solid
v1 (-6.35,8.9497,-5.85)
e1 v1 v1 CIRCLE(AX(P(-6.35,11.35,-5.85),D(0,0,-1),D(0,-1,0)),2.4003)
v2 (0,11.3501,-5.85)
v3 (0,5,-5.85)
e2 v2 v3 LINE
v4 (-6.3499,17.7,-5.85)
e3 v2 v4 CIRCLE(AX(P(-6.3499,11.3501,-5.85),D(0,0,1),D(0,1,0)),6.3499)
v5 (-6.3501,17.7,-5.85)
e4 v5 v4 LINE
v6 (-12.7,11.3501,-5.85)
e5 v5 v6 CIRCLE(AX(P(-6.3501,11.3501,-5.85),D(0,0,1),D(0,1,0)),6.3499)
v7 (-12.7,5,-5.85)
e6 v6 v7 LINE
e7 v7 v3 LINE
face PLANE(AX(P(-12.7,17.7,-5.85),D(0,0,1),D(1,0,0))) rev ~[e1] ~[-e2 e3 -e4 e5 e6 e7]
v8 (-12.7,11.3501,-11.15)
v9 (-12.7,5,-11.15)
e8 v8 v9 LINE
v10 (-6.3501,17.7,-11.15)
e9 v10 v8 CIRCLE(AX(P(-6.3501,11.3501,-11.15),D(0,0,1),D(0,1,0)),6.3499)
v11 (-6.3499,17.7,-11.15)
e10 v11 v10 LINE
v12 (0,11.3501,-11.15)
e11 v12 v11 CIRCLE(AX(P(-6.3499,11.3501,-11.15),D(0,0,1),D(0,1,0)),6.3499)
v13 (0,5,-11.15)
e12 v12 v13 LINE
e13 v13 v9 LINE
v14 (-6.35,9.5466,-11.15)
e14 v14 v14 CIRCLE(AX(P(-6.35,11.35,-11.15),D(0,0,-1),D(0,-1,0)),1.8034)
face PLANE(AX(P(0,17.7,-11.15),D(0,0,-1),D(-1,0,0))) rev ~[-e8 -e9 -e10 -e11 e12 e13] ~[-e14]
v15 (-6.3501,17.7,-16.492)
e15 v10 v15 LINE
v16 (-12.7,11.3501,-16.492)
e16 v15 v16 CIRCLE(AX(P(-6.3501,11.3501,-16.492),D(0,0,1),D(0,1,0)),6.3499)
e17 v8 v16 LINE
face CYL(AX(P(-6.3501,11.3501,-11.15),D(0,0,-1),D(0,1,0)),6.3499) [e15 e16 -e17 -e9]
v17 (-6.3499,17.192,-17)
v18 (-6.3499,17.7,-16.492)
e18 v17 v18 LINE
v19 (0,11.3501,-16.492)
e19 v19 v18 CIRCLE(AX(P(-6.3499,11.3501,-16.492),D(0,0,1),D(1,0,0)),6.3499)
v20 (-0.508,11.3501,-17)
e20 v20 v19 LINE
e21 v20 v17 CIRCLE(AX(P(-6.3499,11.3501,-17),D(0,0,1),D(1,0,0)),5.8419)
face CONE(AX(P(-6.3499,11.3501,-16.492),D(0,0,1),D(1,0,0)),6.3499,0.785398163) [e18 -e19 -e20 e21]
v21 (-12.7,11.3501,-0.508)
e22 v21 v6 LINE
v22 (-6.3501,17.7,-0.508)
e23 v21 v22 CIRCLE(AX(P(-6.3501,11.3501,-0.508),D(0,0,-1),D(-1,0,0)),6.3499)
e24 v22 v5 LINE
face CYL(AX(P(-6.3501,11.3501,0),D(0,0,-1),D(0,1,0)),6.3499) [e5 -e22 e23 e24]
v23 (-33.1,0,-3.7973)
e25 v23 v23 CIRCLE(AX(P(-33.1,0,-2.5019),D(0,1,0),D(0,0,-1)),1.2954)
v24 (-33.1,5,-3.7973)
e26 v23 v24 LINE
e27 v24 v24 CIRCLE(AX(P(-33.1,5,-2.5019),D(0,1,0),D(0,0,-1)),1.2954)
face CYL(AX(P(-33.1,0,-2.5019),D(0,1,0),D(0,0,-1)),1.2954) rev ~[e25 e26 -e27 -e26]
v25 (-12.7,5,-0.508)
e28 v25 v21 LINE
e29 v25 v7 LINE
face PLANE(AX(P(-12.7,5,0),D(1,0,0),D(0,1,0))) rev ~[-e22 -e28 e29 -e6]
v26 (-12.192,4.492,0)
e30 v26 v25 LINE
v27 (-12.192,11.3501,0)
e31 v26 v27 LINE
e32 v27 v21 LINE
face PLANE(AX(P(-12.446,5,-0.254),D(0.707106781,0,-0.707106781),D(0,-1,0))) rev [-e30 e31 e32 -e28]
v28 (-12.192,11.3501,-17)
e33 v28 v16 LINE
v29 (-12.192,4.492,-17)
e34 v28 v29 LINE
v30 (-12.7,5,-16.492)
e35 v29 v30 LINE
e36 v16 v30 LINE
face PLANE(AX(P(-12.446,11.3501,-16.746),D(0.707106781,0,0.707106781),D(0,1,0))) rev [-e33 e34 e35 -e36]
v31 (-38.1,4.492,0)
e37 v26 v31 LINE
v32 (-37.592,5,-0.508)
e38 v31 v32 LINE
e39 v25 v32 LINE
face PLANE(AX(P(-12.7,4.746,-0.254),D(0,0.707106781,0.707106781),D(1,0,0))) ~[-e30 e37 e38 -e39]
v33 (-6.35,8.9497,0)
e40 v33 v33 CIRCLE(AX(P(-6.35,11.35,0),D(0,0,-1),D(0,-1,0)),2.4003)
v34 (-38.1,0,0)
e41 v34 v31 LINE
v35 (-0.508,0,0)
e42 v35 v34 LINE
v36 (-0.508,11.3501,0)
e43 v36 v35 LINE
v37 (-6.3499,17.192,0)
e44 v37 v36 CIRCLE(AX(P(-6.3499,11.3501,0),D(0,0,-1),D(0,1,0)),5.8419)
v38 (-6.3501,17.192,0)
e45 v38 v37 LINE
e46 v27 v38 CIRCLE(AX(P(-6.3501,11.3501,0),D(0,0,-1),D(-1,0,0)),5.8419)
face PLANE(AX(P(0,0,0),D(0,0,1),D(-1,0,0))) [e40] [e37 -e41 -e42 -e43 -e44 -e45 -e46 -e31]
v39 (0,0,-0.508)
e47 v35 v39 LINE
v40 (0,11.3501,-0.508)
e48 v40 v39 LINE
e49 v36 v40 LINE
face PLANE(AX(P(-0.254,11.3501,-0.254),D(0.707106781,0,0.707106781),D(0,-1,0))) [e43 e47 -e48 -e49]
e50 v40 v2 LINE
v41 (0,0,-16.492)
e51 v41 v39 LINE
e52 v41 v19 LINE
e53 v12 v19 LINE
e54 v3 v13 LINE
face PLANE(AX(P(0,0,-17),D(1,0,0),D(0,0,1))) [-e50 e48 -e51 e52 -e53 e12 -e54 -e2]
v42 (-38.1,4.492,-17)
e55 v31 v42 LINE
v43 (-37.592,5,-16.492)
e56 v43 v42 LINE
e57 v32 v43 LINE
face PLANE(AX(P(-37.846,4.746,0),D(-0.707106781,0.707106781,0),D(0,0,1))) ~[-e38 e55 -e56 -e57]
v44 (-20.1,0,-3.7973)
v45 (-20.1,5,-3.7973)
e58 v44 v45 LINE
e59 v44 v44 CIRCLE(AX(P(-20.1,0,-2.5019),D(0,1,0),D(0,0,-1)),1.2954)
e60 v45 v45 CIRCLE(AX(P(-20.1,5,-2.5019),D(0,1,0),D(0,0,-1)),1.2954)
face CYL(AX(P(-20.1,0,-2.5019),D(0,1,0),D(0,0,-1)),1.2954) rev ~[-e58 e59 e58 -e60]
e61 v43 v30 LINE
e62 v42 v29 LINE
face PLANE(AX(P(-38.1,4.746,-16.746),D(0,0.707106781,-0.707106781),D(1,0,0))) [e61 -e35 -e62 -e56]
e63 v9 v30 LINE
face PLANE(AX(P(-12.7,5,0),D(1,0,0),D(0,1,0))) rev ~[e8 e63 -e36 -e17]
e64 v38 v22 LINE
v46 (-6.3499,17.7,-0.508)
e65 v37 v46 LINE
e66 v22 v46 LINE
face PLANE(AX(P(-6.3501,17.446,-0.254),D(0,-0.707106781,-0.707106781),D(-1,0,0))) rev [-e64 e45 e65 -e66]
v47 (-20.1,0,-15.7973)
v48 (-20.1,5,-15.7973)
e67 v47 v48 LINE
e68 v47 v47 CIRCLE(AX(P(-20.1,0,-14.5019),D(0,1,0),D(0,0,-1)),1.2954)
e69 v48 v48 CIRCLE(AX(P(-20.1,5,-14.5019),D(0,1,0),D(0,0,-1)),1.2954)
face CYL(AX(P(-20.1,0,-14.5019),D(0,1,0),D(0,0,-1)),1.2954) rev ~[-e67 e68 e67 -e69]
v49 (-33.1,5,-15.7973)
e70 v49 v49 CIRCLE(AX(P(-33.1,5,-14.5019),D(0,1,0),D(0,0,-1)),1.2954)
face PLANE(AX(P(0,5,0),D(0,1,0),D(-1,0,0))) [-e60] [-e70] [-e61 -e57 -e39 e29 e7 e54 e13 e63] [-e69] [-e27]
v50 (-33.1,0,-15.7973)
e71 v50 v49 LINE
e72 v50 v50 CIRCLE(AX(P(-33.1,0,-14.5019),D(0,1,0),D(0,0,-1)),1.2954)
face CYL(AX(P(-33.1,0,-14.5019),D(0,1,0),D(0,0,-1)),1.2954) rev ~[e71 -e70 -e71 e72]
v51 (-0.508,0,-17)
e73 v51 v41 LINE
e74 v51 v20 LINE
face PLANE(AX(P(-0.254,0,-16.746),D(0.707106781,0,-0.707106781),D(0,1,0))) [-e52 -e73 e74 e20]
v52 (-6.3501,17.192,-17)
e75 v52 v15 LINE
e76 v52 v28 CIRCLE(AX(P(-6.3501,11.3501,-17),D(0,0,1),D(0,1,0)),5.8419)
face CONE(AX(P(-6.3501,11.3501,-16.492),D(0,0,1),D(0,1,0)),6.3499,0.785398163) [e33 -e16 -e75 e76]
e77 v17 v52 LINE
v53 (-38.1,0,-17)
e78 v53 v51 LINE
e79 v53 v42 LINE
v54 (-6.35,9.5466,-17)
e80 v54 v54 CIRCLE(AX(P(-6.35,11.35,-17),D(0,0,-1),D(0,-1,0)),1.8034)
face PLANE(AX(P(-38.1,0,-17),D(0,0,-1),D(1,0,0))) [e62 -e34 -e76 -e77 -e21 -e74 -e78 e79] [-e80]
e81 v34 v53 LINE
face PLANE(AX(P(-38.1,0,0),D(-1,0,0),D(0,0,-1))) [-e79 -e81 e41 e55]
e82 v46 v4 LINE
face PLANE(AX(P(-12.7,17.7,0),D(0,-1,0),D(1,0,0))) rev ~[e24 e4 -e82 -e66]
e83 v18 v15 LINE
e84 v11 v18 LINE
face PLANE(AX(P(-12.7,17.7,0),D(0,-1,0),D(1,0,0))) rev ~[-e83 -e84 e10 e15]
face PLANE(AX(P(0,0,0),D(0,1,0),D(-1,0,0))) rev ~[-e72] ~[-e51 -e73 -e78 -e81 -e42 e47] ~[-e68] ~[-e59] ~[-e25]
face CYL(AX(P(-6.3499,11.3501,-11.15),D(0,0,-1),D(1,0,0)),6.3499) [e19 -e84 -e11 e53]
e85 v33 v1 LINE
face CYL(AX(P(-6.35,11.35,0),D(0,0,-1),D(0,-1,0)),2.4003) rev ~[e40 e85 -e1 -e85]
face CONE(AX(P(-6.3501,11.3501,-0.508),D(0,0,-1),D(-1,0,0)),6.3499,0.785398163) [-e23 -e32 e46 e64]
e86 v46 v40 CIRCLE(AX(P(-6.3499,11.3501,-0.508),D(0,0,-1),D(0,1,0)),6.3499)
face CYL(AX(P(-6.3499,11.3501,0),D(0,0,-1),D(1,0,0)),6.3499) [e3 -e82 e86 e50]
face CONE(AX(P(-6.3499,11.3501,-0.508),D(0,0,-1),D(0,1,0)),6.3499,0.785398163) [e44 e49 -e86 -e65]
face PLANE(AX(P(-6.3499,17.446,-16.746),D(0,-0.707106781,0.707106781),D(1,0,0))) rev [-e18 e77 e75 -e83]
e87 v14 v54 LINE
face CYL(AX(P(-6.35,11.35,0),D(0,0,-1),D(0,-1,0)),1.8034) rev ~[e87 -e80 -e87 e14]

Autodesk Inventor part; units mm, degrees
ref_plane "YZ Plane" through (0, 0, 0) normal (1, 0, 0) x (0, 1, 0)
ref_plane "XZ Plane" through (0, 0, 0) normal (0, 1, 0) x (-1, 0, 0)
ref_plane "XY Plane" through (0, 0, 0) normal (0, 0, 1) x (1, 0, 0)
sketch "Sketch1" plane through (0, 0, 0) normal (0, 1, 0) x (-1, 0, 0)
  line L0 (0, 0) -> (38.1, 0)
  line L1 (38.1, 0) -> (38.1, -17)
  line L2 (38.1, -17) -> (0, -17)
  line L3 (0, -17) -> (0, 0)
  circle A0 centre (33.1, -2.5019) radius 1
  circle A1 centre (20.1, -2.5019) radius 1
  circle A2 centre (33.1, -14.5019) radius 1
  circle A3 centre (20.1, -14.5019) radius 1
  dimension "d0" = 38.1
  dimension "d1" = 17
  dimension "d41" = 2
  dimension "d42" = 2
  dimension "d43" = 2
  dimension "d44" = 2
  dimension "d45" = 13
  dimension "d46" = 12
  dimension "d47" = 2.5019
  dimension "d48" = 5
extrude "Extrusion1" add sketch "Sketch1" along normal blind 5 contours L0 L1 L2 L3 | A0 | A1 | A2 | A3
sketch "Sketch2" plane through (-38.1, 0, 0) normal (0, 0, 1) x (1, 0, 0)
  line L0 (0, 0) -> (38.1, 0) projected
  line L1 (38.1, 0) -> (38.1, 5) projected
  line L2 (0, 5) -> (38.1, 5) projected
  line L3 (0, 0) -> (0, 5) projected
  line L4 (38.1, 5) -> (25.4, 5)
  line L5 (25.4, 5) -> (25.4, 17.7)
  line L6 (25.4, 17.7) -> (38.1, 17.7)
  line L7 (38.1, 17.7) -> (38.1, 5)
  line L8 (31.75, 17.7) -> (31.75, 5) construction
  circle A0 centre (31.75, 11.35) radius 1.5
  point P0 (25.4, 5)
  dimension "d6" = 12.7
  dimension "d7" = 12.7
  dimension "d14" = 3
extrude "Extrusion2" add sketch "Sketch2" against normal up to surface (17 mm away) contours L2 L5 L6 L7 | A0
sketch "Sketch3" plane through (-12.7, 17.7, 0) normal (0, 1, 0) x (1, 0, 0)
  line L0 (12.7, 17) -> (0, 17) projected
  line L1 (0, 0) -> (0, 17) projected
  line L2 (12.7, 0) -> (0, 0) projected
  line L3 (12.7, 0) -> (12.7, 17) projected
  line L4 (0, 8.5) -> (12.7, 8.5) construction
  line L5 (0, 5.85) -> (12.7, 5.85)
  line L6 (12.7, 5.85) -> (12.7, 11.15)
  line L7 (12.7, 11.15) -> (0, 11.15)
  line L8 (0, 11.15) -> (0, 5.85)
  line L9 (0, 5.85) -> (12.7, 11.15) construction
  line L10 (12.7, 5.85) -> (0, 11.15) construction
  point P0 (12.7, 0)
  point P1 (6.35, 8.5)
  point P2 (0, 11.15)
  point P3 (0, 5.85)
  point P4 (12.7, 5.85)
  dimension "d10" = 5.3
extrude "Extrusion3" cut sketch "Sketch3" against normal up to surface (12.7 mm away) contours L3 L5 L1 L7
hole "Hole1" at (-33.1, 0, -2.5019) at (-20.1, 0, -2.5019) at (-20.1, 0, -14.5019) at (-33.1, 0, -14.5019) direction (0, 1, 0) diameter 2.5908 end through all clearance for "Flat Head Machine Screw" size "M2" standard "Ansi Metric M Profile"
fillet "Fillet1" radius 6.35 4 edges at (-12.7, 17.7, -2.925) (0, 17.7, -2.925) (0, 17.7, -14.075) (-12.7, 17.7, -14.075)
chamfer "Chamfer1" distance 0.508 angle 45 9 edges at (-25.4, 5, 0) (-12.7, 8.175, 0) (-10.8402, 15.8402, 0) (0, 5.6751, 0) (-1.8598, 15.8402, -17) (-12.7, 8.175, -17) (0, 5.6751, -17) (-25.4, 5, -17) (-38.1, 5, -8.5)
hole "Hole2" at (-6.35, 11.35, 0) direction (0, 0, -1) diameter 3.6068 end through all clearance for "Flat Head Machine Screw" size "M3" standard "Ansi Metric M Profile"
hole "Hole3" at (-6.35, 11.35, 0) direction (0, 0, -1) diameter 4.8006 depth 5.85 clearance for "Flat Head Machine Screw" size "M4" standard "Ansi Metric M Profile"
